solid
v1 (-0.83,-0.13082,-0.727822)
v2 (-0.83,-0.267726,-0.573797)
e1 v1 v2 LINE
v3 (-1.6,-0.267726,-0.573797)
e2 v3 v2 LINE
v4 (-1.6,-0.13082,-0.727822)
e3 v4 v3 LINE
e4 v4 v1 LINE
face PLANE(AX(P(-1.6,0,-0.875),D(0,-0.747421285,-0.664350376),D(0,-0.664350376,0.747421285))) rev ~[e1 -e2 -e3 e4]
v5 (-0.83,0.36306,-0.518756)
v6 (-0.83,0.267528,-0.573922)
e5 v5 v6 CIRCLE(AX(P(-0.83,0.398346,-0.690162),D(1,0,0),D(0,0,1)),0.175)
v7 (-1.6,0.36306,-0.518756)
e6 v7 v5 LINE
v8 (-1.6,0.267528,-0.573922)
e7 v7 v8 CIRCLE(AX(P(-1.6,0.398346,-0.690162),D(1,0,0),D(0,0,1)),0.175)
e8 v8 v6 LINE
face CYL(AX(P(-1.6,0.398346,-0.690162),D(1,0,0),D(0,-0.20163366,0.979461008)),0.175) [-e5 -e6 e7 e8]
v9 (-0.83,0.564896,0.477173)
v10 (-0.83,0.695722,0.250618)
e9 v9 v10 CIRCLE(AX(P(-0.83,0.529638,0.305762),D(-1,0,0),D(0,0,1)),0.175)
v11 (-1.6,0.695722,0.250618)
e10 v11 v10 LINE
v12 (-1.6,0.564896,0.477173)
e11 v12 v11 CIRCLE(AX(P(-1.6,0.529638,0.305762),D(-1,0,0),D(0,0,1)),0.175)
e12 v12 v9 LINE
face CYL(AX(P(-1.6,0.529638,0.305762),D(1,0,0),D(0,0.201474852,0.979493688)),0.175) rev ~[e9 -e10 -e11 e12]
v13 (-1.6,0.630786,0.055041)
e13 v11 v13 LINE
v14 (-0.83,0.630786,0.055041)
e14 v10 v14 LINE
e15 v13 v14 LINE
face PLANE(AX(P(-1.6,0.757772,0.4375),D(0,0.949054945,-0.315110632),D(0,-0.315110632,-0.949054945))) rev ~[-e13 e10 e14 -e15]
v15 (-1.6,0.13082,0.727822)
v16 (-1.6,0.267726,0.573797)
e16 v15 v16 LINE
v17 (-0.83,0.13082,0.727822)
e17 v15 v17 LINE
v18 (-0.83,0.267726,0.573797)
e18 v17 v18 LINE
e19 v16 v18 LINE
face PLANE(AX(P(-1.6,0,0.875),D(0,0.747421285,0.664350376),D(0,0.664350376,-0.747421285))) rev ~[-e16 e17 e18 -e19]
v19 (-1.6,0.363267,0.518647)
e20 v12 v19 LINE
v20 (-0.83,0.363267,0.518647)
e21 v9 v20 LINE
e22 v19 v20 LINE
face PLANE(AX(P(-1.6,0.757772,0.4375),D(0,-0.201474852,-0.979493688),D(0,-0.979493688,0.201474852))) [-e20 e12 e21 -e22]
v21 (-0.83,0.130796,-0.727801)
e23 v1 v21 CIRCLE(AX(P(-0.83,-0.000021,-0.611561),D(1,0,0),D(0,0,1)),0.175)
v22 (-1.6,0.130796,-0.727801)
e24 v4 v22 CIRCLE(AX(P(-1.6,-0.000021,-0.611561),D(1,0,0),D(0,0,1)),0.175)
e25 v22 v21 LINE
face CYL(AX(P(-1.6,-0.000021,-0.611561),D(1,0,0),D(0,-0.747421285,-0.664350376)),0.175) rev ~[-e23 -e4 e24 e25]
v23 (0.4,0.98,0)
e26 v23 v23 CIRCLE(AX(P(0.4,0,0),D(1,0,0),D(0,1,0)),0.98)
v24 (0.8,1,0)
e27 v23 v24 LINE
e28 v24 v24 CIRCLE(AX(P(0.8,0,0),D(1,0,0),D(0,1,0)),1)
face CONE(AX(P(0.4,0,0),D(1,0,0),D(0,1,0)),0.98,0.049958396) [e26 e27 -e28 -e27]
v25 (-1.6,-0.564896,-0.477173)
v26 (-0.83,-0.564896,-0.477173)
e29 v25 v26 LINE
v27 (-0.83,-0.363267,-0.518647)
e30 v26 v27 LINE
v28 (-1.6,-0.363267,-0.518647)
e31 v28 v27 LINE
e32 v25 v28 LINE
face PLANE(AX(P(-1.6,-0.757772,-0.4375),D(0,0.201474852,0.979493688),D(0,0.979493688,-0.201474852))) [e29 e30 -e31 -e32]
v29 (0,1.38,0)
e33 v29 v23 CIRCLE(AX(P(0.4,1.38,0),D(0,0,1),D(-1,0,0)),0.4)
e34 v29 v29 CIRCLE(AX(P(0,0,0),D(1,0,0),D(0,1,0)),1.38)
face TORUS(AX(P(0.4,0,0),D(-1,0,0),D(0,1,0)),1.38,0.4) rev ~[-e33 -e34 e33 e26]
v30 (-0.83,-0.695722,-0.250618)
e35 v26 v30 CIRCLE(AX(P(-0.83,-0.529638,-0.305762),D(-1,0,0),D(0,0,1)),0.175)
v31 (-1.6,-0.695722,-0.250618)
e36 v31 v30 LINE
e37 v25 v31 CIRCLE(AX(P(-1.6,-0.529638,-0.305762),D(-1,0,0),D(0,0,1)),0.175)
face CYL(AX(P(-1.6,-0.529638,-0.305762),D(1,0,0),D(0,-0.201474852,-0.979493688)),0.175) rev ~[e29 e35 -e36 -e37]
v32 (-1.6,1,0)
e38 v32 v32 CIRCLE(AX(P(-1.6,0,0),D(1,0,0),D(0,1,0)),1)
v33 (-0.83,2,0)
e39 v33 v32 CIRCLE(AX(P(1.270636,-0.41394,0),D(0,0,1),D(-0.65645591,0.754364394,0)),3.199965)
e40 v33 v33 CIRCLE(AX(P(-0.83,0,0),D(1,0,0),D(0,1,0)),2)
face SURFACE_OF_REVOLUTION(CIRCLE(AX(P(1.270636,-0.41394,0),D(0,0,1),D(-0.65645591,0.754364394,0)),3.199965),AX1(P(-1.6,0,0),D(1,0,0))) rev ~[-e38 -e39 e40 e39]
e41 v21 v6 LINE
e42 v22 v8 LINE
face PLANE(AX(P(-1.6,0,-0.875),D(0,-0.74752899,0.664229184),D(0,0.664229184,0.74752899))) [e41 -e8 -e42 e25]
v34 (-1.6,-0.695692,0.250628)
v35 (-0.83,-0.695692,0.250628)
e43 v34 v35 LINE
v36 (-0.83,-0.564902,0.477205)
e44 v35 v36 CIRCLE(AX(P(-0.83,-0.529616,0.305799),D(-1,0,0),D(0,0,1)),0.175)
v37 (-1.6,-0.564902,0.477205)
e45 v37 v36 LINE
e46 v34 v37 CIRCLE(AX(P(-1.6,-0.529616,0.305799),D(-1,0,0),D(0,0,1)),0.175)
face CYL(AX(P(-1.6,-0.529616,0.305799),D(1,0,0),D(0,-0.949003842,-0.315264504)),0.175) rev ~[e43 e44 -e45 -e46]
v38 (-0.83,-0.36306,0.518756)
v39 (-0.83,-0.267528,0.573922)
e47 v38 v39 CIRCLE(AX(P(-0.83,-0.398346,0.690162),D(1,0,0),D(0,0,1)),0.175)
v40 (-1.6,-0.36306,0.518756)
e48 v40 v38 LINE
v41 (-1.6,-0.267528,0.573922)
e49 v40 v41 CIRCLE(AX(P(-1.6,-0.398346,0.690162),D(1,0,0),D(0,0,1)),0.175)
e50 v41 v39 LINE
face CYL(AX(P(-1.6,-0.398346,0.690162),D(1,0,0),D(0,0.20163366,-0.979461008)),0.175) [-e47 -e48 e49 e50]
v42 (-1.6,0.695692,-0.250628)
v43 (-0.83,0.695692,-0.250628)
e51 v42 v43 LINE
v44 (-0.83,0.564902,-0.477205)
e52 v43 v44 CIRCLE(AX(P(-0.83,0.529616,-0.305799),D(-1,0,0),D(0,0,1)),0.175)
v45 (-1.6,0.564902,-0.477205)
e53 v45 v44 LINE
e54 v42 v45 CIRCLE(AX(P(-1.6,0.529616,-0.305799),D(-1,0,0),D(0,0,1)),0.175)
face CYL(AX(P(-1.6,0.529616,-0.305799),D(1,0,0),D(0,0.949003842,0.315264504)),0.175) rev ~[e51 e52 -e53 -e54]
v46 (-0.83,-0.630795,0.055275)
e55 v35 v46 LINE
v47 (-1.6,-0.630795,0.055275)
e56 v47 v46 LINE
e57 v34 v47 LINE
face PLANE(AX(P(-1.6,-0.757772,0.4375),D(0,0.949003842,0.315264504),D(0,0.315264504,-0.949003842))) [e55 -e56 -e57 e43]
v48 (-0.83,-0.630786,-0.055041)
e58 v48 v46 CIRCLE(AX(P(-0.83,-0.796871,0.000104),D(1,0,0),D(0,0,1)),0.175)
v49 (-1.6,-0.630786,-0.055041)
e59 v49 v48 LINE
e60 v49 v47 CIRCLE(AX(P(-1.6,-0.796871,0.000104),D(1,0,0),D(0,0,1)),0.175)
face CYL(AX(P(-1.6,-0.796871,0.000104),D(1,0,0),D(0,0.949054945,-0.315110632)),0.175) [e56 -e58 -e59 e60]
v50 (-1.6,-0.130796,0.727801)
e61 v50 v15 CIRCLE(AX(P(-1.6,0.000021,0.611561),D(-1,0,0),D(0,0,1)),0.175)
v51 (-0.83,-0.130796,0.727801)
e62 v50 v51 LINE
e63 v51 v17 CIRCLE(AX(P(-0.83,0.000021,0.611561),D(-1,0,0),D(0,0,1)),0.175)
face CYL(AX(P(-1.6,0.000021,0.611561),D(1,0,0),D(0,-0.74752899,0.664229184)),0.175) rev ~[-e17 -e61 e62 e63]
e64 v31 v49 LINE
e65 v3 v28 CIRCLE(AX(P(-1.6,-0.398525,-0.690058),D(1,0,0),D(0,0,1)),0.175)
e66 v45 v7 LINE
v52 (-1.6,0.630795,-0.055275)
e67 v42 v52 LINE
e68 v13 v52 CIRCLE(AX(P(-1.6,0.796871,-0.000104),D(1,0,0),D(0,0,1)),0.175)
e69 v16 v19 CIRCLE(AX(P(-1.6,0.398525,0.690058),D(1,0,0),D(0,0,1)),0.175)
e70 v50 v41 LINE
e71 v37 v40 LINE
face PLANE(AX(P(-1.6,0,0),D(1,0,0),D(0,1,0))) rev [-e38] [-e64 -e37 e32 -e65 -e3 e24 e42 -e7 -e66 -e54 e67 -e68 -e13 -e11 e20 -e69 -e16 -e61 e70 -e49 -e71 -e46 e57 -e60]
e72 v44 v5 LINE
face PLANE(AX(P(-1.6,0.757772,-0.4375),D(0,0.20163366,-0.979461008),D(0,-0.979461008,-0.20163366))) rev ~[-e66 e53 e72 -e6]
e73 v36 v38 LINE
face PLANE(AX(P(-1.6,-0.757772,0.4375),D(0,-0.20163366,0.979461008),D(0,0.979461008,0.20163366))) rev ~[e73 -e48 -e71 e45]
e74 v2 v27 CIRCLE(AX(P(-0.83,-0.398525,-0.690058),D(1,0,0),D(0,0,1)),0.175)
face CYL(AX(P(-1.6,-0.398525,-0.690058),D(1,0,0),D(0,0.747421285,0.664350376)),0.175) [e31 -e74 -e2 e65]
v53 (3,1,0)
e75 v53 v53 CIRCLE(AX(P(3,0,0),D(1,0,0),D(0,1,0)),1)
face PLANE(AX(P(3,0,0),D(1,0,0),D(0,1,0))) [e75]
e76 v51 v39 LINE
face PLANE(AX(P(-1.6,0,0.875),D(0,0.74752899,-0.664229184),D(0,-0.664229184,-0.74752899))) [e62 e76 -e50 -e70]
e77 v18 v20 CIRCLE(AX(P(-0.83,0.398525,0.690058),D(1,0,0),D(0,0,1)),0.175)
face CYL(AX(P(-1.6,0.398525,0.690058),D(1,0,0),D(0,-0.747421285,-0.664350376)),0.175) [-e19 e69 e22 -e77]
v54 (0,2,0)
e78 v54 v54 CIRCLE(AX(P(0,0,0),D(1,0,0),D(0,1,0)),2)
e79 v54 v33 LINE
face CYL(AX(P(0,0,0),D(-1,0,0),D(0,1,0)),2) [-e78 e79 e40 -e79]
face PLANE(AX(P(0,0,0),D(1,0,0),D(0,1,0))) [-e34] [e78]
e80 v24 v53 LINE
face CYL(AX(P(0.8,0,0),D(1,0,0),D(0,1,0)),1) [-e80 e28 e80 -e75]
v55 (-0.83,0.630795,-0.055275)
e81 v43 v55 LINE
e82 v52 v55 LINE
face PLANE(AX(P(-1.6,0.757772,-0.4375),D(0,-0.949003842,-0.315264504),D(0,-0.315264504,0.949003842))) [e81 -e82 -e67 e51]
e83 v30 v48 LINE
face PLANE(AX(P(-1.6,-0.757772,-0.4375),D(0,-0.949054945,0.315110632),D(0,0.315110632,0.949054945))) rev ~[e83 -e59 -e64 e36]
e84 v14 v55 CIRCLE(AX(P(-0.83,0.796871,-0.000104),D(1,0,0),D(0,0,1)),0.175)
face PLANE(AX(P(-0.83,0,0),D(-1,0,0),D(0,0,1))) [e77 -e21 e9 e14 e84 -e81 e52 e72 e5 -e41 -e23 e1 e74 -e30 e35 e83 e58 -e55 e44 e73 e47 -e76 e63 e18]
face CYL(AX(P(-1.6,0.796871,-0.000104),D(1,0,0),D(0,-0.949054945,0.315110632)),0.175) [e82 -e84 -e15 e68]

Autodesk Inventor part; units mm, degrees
ref_plane "YZ Plane" through (0, 0, 0) normal (1, 0, 0) x (0, 1, 0)
ref_plane "XZ Plane" through (0, 0, 0) normal (0, 1, 0) x (-1, 0, 0)
ref_plane "XY Plane" through (0, 0, 0) normal (0, 0, 1) x (1, 0, 0)
sketch "Sketch4" plane through (0, 0, 0) normal (0, 0, 1) x (1, 0, 0)
  line L0 (-1.6, 0) -> (3, 0)
  line L1 (0, 0) -> (-1.6, 0)
  line L2 (0, 2) -> (0, 1.38)
  line L3 (0.4, 0.98) -> (0.4, 0.98)
  line L4 (0.4, 0.98) -> (0.8, 1)
  arc A0 (0, 1.38) -> (0.4, 0.98) centre (0.4, 1.38) ccw
  line L5 (-1.6, 0) -> (-1.6, 1)
  line L6 (0, 2) -> (-0.83, 2)
  arc A1 (-0.83, 2) -> (-1.6, 1) centre (1.2707, -0.414) ccw
  line L7 (0.8, 1) -> (3, 1)
  line L8 (3, 1) -> (3, 0)
  point P0 (0, 0.98)
  dimension "d71" = 0.4
  dimension "d72" = 3
  dimension "d74" = 0.4
  dimension "d75" = 1.96
  dimension "d78" = 2
  dimension "d82" = 3.2
  dimension "d83" = 1.6
  dimension "d84" = 4
  dimension "d104" = 2.2
  dimension "d105" = 2
revolve "Revolution7" add sketch "Sketch4" angle 360 about axis through (-1.6, 0, 0) along (1, 0, 0)
sketch "Sketch5" plane through (-1.6, 0, 0) normal (-1, 0, 0) x (0, 0, 1)
  circle A0 centre (0, 0) radius 0.875 construction
  circle A1 centre (0, 0) radius 0.6125 construction
  line L0 (0, 0) -> (-0.5304, 0.3062)
  line L1 (0, 0) -> (-0.5304, -0.3063)
  line L2 (-1.8008, 0) -> (1.7887, 0)
  line L3 (-0.875, 0) -> (-0.5304, -0.3063)
  line L4 (-0.875, 0) -> (-0.5304, 0.3062)
  point P0 (0, 0)
  dimension "d88" = 1.75
  dimension "d89" = 1.225
  dimension "d90" = 30
  dimension "d91" = 30
extrude "Extrusion1" cut sketch "Sketch5" against normal blind 0.77
pattern_circular "Circular Pattern1" count 6 over 360 about axis through (-10, 0, 0) along (1, 0, 0) of "Extrusion1"
fillet "Fillet1" radius 0.175 12 edges at (-1.215, -0.7578, -0.4375) (-1.215, -0.3063, -0.5304) (-1.215, -0.6125, 0) (-1.215, -0.7578, 0.4375) (-1.215, -0.3062, 0.5304) (-1.215, 0, 0.875) (-1.215, 0.6125, 0) (-1.215, 0.7578, 0.4375) (-1.215, 0.3063, 0.5304) (-1.215, 0.3062, -0.5304) (-1.215, 0, -0.875) (-1.215, 0.7578, -0.4375)
thread "Thread7" size "M2x0.4" class "6g" standard "ISO Metric profile" length 2.2
properties part number "Flachkopfschraube mit Innenrund ISO 14583 - M2 x 3 - 4.8" material "Stahl"
